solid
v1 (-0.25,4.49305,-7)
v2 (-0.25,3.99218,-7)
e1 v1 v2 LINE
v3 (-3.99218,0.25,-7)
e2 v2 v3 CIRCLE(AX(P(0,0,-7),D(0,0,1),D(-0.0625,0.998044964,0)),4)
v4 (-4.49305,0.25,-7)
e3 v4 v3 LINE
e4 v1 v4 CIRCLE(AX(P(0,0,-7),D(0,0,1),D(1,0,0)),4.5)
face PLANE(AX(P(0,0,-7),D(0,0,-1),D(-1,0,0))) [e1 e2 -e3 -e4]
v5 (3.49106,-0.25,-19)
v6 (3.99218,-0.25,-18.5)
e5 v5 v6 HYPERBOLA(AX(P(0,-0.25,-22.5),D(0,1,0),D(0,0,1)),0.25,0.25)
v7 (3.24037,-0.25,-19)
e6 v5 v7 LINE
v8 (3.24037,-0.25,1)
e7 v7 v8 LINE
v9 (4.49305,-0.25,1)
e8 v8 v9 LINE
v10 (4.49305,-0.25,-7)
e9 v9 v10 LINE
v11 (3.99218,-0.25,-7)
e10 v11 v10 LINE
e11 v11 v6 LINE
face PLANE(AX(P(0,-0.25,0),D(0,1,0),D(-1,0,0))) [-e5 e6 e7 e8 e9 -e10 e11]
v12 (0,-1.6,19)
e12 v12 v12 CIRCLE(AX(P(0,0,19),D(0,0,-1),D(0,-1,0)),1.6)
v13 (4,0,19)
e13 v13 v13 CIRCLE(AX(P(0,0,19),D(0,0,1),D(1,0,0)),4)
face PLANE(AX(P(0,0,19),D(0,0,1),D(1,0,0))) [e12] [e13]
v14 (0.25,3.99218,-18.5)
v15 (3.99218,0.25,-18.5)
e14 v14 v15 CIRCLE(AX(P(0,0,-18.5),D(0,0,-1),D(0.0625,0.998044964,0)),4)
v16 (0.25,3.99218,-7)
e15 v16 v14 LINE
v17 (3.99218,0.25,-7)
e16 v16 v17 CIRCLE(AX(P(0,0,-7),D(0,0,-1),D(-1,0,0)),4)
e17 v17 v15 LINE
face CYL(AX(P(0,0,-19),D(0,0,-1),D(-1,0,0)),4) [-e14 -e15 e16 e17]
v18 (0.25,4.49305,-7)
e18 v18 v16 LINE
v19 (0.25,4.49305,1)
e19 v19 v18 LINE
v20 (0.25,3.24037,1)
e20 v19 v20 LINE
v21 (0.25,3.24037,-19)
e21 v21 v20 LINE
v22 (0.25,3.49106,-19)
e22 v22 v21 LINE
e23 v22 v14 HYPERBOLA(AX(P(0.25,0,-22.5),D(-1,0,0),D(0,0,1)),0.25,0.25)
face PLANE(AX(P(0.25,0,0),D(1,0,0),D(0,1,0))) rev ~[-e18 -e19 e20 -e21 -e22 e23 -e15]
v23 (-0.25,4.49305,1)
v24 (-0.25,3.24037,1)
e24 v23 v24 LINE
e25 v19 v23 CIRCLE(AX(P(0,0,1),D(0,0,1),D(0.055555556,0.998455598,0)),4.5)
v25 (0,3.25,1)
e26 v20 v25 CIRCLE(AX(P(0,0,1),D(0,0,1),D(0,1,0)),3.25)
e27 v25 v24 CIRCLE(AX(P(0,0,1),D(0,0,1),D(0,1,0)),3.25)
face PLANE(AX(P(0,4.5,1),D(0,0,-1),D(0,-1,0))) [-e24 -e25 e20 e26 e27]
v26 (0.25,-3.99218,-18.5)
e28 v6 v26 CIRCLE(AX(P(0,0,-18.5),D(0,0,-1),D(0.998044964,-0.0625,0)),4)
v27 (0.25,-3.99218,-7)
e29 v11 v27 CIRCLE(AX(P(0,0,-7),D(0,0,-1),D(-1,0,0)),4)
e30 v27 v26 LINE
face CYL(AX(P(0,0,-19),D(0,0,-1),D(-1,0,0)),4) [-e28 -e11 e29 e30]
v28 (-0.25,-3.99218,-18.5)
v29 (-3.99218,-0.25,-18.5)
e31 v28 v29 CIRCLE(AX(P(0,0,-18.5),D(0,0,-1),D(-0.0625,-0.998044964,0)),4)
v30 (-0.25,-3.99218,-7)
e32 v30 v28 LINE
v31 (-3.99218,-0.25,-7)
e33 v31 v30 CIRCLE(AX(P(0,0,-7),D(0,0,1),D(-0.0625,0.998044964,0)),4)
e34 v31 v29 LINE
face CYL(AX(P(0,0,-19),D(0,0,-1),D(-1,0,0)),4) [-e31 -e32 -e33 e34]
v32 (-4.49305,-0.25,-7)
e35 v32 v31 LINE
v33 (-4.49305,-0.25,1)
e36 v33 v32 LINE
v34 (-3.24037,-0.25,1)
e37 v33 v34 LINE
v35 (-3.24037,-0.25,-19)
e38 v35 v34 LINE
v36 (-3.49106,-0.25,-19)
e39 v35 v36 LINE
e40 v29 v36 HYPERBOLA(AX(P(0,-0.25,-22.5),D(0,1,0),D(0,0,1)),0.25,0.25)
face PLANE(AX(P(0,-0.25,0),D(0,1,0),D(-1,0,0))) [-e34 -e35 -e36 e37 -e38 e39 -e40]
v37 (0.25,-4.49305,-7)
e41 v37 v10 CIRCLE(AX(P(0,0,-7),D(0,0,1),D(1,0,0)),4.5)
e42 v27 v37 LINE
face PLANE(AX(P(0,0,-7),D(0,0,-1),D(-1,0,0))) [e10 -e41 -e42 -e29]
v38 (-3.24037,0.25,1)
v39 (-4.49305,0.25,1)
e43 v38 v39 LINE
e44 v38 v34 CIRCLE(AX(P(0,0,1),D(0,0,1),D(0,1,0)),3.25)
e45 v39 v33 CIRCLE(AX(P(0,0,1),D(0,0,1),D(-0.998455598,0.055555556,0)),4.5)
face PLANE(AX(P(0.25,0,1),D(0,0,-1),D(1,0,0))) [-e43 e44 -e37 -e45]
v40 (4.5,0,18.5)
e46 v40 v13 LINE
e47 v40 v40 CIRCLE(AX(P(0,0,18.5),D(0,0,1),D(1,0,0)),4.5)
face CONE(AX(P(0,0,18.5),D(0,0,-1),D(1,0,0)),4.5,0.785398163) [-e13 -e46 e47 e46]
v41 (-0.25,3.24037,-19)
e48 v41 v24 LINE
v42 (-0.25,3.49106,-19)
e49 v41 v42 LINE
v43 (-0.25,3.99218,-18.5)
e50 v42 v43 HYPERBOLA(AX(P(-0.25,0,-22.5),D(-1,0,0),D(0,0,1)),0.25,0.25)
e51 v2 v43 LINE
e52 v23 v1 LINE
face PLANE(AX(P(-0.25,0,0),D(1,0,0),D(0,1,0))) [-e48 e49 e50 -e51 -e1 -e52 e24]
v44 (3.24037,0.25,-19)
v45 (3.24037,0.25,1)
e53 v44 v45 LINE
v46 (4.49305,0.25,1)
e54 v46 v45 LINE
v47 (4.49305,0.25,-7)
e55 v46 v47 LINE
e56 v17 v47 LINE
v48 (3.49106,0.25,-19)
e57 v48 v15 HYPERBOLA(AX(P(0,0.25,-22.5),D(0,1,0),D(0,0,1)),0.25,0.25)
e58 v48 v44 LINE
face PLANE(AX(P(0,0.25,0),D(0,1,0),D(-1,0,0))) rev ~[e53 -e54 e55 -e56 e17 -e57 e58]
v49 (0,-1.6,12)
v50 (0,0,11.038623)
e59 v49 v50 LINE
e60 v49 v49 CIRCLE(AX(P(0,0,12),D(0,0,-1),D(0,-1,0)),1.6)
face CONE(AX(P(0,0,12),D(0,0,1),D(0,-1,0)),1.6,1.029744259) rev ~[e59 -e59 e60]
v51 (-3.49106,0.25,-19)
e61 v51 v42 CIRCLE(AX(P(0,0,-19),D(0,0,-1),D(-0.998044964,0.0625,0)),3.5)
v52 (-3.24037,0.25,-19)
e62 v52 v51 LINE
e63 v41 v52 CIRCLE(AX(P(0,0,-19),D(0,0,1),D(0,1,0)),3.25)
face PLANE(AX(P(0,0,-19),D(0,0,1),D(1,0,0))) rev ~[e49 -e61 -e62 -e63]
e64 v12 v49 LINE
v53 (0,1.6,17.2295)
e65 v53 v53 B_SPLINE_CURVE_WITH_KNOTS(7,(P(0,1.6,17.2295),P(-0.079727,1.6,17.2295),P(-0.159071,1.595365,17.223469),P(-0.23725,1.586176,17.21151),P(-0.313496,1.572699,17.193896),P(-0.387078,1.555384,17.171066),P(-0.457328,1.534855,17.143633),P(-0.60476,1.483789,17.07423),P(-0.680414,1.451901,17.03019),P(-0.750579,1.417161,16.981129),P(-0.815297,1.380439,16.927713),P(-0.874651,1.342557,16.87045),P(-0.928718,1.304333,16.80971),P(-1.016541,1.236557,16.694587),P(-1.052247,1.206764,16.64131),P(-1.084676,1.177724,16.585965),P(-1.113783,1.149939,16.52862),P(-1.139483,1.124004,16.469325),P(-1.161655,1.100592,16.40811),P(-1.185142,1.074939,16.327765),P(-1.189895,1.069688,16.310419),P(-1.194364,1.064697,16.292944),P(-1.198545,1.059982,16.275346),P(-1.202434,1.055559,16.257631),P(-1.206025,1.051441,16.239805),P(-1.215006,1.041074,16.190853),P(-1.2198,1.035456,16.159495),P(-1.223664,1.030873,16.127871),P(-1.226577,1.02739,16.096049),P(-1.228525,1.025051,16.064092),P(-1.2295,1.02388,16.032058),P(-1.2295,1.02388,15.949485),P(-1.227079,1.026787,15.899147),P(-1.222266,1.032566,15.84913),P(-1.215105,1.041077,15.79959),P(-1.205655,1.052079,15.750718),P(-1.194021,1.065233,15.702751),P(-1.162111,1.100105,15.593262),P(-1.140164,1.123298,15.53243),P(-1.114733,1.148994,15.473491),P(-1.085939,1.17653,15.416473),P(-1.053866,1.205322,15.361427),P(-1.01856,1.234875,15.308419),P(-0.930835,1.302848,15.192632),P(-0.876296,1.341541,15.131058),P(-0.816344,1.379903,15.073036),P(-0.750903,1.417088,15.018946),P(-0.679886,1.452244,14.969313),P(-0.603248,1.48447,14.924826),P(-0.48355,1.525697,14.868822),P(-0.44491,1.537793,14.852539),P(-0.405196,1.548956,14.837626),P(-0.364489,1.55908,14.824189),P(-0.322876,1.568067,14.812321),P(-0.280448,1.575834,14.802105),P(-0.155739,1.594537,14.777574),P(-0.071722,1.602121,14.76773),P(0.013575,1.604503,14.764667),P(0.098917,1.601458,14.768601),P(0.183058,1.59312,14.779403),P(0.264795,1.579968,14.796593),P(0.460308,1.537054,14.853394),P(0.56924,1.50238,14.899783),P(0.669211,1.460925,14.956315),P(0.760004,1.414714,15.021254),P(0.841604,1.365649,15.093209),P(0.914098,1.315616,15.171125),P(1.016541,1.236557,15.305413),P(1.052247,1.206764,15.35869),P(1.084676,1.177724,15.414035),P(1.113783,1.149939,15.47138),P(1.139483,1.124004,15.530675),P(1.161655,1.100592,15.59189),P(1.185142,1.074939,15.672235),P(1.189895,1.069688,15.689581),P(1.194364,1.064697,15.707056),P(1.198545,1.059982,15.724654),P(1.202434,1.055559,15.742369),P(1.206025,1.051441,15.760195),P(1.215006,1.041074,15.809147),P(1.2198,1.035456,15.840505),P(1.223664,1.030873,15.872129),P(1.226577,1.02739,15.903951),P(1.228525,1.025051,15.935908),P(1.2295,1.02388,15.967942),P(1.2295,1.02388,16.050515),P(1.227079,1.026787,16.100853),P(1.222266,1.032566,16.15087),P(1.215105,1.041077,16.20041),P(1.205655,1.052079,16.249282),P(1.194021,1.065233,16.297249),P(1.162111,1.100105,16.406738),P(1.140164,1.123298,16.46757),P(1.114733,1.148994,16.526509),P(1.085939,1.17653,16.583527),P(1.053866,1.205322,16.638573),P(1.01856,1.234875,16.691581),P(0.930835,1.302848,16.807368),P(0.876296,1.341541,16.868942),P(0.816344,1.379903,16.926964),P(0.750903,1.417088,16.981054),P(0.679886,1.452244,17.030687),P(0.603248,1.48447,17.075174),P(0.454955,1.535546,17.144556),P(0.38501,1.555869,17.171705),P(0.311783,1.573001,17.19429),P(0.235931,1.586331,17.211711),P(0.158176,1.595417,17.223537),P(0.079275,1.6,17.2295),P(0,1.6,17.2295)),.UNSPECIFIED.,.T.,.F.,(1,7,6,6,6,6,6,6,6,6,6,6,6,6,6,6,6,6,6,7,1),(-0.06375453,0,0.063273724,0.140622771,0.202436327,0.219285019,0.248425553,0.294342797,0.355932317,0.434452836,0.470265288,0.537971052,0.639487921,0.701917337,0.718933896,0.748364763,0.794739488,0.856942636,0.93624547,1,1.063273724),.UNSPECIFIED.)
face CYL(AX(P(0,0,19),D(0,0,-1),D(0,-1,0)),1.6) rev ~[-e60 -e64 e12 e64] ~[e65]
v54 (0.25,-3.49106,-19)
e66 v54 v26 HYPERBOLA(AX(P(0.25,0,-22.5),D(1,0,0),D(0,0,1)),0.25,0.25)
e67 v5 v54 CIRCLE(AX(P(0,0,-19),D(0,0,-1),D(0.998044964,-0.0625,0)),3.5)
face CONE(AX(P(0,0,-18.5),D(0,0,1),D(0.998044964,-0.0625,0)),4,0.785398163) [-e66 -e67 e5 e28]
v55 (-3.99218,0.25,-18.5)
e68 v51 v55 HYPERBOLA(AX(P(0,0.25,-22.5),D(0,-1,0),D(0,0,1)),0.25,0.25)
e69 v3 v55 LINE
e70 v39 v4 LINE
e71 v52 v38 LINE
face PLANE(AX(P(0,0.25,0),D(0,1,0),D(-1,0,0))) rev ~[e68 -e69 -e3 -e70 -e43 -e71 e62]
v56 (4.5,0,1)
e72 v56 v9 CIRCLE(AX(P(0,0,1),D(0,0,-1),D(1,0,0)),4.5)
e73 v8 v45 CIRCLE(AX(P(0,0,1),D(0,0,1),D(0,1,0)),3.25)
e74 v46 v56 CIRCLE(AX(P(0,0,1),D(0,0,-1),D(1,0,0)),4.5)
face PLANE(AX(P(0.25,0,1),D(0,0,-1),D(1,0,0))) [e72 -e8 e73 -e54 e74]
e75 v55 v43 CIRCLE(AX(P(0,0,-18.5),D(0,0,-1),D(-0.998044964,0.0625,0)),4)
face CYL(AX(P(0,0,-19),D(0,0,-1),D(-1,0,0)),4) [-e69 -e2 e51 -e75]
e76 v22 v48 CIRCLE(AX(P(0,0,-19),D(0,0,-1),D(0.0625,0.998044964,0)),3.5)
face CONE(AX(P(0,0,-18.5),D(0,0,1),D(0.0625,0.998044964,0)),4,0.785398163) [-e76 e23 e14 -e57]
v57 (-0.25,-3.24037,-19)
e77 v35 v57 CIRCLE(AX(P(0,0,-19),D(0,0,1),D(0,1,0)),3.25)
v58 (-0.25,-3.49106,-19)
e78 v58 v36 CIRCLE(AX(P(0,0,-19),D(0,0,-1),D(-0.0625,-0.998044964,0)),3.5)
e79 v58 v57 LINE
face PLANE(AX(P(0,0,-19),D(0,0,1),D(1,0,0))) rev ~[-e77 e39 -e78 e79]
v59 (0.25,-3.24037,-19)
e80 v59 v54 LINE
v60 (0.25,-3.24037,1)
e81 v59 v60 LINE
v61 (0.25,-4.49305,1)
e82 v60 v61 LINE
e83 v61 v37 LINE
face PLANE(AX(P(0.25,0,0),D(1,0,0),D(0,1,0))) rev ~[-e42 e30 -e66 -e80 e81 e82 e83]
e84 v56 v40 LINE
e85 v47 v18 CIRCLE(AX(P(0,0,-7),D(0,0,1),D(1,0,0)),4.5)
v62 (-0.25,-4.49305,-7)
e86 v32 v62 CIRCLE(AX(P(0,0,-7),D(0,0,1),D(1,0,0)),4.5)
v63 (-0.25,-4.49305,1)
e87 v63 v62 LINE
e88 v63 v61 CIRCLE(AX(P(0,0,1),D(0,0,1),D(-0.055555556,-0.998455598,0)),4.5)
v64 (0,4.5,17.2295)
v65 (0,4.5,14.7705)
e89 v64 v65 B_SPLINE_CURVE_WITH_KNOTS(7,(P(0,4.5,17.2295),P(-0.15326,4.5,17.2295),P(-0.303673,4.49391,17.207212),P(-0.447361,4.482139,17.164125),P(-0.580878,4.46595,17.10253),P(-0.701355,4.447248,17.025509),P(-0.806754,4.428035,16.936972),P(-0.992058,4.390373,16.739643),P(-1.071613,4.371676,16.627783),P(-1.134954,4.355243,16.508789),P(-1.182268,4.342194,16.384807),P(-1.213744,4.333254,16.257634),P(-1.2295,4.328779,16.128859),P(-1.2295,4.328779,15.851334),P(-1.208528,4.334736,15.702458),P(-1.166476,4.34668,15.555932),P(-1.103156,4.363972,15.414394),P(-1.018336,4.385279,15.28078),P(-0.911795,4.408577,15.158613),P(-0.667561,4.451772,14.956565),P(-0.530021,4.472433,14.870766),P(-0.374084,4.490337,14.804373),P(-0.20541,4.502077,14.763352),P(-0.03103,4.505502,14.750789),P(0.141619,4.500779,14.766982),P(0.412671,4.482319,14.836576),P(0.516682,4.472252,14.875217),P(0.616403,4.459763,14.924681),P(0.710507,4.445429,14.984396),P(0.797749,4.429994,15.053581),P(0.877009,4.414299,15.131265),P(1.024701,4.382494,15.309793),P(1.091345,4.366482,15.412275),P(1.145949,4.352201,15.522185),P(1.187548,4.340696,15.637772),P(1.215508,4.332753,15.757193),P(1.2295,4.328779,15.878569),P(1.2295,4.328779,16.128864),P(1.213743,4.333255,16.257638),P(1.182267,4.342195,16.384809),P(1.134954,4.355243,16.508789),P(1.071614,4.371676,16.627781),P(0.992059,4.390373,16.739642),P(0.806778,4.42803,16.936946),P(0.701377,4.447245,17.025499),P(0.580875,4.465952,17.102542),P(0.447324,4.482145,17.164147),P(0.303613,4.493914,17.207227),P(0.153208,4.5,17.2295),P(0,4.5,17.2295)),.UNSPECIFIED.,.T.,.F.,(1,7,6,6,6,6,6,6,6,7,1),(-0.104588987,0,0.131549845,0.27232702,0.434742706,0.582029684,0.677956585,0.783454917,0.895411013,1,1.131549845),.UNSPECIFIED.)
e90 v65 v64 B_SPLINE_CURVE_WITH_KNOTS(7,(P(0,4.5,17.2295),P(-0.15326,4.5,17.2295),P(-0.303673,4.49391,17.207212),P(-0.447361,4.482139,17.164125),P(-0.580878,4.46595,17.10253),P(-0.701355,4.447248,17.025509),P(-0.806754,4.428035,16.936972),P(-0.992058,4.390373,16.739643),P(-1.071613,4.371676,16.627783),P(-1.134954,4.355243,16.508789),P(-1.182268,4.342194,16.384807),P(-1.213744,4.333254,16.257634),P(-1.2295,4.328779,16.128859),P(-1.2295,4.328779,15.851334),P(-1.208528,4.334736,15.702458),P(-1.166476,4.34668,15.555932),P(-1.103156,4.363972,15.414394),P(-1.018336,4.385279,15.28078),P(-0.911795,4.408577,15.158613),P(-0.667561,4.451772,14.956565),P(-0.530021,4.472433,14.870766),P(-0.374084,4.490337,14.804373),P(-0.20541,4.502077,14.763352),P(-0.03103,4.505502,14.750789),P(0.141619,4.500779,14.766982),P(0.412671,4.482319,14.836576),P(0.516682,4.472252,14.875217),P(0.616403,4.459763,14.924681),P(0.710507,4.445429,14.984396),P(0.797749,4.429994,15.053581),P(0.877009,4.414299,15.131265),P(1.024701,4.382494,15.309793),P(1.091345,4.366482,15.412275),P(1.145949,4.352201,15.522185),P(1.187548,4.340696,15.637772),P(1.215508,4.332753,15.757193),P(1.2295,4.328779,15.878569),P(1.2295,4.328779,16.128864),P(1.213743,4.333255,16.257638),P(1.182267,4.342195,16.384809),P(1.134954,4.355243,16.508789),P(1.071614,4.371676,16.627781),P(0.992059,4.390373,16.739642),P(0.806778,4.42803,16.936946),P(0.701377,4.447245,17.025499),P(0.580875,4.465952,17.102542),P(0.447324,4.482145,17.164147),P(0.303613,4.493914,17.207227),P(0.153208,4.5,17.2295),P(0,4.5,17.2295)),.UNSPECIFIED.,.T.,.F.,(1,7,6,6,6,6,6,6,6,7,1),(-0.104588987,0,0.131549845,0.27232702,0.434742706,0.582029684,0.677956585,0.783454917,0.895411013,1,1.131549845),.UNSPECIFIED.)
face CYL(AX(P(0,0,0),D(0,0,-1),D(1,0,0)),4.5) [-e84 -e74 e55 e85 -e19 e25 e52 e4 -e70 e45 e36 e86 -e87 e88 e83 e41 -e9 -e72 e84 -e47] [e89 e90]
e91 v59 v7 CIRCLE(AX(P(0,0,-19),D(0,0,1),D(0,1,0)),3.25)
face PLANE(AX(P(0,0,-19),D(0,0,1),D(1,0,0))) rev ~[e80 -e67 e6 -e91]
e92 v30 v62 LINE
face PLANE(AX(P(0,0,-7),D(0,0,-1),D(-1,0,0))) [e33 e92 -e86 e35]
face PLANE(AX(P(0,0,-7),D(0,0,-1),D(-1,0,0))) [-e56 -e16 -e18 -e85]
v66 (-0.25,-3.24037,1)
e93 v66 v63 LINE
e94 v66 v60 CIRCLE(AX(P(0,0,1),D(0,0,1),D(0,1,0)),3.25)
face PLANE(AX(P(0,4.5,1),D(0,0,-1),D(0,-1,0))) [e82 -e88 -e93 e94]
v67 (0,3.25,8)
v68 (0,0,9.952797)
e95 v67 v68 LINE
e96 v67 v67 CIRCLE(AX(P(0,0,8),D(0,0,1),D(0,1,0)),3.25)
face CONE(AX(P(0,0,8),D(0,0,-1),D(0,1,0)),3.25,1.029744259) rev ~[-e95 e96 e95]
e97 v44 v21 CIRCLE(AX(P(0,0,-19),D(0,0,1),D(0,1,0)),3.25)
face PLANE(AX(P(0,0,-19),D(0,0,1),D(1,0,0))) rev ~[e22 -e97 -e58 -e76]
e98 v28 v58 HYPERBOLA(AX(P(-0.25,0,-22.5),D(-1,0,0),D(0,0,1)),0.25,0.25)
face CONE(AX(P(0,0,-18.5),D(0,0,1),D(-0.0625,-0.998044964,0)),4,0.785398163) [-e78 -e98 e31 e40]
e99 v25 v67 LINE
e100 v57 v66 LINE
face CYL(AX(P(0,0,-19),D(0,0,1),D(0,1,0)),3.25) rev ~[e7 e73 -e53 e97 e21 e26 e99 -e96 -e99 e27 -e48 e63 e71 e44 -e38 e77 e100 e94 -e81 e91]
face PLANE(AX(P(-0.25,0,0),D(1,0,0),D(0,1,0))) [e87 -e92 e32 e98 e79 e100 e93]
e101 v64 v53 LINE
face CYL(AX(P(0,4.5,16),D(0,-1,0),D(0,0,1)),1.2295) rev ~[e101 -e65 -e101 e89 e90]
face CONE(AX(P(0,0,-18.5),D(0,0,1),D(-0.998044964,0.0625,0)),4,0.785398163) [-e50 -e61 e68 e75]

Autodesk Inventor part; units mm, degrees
ref_plane "YZ Plane" through (0, 0, 0) normal (1, 0, 0) x (0, 1, 0)
ref_plane "XY Plane" through (0, 0, 0) normal (0, 0, 1) x (1, 0, 0)
sketch "Esboço1" plane through (0, 0, 0) normal (0, 0, 1) x (1, 0, 0)
  circle A0 centre (0, 0) radius 4.5
  dimension "d0" = 9
extrude "Extrusão1" add sketch "Esboço1" along normal mid plane 38
sketch "Esboço2" plane through (0, 0, 19) normal (0, 0, 1) x (1, 0, 0)
  point P0 (0, 0)
  point P1 (0, 0)
hole "Furo1" at (0, 0, 19) direction (0, 0, -1) diameter 3.2 depth 7 tip angle 118
sketch "Esboço3" plane through (0, 0, -19) normal (0, 0, -1) x (-1, 0, 0)
  point P0 (0, 0)
  point P1 (0, 0)
hole "Furo2" at (0, 0, -19) direction (0, 0, 1) diameter 6.5 depth 27 tip angle 118
sketch "Esboço4" plane through (0, 0, -19) normal (0, 0, -1) x (-1, 0, 0)
  circle A0 centre (0, 0) radius 4.5 projected
  circle A1 centre (0, 0) radius 4
  dimension "d18" = 8
extrude "Extrusão2" cut sketch "Esboço4" against normal blind 12
sketch "Esboço5" plane through (0, 0, 0) normal (1, 0, 0) x (0, 1, 0)
  line L0 (4.5, -7) -> (4.5, 19) projected
  line L1 (4.5, 1) -> (-4.5, 1)
  line L2 (-4.5, 1) -> (-4.5, -19)
  line L3 (4.5, -19) -> (4.5, 1)
  line L4 (-4.5, -7) -> (-4.5, 19) projected
  line L5 (-4, -19) -> (4, -19) projected
  line L6 (4, -19) -> (4, -7) projected
  line L7 (4.5, -19) -> (-4.5, -19)
  point P0 (0, 0)
  dimension "d23" = 20
extrude "Extrusão3" cut sketch "Esboço5" along normal mid plane 0.5
sketch "Esboço6" plane through (0, 0, 0) normal (0, 1, 0) x (-1, 0, 0)
  line L0 (-4.5, -7) -> (-4.5, 19) projected
  line L1 (4.5, -7) -> (4.5, 19) projected
  line L2 (-0.25, 1) -> (0.25, 1)
  line L3 (-4.5, -19) -> (4.5, -19)
  line L4 (4.5, -19) -> (4.5, 1)
  line L5 (4.5, 1) -> (-4.5, 1)
  line L6 (-4.5, 1) -> (-4.5, -19)
  line L7 (-4, -19) -> (-0.25, -19) projected
  line L8 (0.25, -19) -> (4, -19) projected
  line L9 (0.25, 1) -> (-0.25, 1) projected
  point P0 (0, 0)
extrude "Extrusão4" cut sketch "Esboço6" along normal mid plane 0.5
ref_plane "Plano de trabalho1" through (0, 4.5, 0) normal (0, 1, 0) x (-1, 0, 0)
sketch "Esboço7" plane through (0, 4.5, 0) normal (0, 1, 0) x (-1, 0, 0)
  line L0 (-1.6, 19) -> (1.6, 19) projected
  line L1 (0, 19) -> (0, 16) construction
  point P0 (0, 0)
  dimension "d28" = 3
hole "Furo3" at (0, 4.5, 16) direction (0, -1, 0) diameter 2.459 end up to surface thread size "M3x0.5" class "6H" standard "ANSI Metric M Profile"
chamfer "Chanfro1" distance 0.5 angle 45 5 edges at (-4.5, 0, 19) (-2.8284, 2.8284, -19) (-2.8284, -2.8284, -19) (2.8284, -2.8284, -19) (2.8284, 2.8284, -19)
properties part number "N4049_pino_contato_T"
